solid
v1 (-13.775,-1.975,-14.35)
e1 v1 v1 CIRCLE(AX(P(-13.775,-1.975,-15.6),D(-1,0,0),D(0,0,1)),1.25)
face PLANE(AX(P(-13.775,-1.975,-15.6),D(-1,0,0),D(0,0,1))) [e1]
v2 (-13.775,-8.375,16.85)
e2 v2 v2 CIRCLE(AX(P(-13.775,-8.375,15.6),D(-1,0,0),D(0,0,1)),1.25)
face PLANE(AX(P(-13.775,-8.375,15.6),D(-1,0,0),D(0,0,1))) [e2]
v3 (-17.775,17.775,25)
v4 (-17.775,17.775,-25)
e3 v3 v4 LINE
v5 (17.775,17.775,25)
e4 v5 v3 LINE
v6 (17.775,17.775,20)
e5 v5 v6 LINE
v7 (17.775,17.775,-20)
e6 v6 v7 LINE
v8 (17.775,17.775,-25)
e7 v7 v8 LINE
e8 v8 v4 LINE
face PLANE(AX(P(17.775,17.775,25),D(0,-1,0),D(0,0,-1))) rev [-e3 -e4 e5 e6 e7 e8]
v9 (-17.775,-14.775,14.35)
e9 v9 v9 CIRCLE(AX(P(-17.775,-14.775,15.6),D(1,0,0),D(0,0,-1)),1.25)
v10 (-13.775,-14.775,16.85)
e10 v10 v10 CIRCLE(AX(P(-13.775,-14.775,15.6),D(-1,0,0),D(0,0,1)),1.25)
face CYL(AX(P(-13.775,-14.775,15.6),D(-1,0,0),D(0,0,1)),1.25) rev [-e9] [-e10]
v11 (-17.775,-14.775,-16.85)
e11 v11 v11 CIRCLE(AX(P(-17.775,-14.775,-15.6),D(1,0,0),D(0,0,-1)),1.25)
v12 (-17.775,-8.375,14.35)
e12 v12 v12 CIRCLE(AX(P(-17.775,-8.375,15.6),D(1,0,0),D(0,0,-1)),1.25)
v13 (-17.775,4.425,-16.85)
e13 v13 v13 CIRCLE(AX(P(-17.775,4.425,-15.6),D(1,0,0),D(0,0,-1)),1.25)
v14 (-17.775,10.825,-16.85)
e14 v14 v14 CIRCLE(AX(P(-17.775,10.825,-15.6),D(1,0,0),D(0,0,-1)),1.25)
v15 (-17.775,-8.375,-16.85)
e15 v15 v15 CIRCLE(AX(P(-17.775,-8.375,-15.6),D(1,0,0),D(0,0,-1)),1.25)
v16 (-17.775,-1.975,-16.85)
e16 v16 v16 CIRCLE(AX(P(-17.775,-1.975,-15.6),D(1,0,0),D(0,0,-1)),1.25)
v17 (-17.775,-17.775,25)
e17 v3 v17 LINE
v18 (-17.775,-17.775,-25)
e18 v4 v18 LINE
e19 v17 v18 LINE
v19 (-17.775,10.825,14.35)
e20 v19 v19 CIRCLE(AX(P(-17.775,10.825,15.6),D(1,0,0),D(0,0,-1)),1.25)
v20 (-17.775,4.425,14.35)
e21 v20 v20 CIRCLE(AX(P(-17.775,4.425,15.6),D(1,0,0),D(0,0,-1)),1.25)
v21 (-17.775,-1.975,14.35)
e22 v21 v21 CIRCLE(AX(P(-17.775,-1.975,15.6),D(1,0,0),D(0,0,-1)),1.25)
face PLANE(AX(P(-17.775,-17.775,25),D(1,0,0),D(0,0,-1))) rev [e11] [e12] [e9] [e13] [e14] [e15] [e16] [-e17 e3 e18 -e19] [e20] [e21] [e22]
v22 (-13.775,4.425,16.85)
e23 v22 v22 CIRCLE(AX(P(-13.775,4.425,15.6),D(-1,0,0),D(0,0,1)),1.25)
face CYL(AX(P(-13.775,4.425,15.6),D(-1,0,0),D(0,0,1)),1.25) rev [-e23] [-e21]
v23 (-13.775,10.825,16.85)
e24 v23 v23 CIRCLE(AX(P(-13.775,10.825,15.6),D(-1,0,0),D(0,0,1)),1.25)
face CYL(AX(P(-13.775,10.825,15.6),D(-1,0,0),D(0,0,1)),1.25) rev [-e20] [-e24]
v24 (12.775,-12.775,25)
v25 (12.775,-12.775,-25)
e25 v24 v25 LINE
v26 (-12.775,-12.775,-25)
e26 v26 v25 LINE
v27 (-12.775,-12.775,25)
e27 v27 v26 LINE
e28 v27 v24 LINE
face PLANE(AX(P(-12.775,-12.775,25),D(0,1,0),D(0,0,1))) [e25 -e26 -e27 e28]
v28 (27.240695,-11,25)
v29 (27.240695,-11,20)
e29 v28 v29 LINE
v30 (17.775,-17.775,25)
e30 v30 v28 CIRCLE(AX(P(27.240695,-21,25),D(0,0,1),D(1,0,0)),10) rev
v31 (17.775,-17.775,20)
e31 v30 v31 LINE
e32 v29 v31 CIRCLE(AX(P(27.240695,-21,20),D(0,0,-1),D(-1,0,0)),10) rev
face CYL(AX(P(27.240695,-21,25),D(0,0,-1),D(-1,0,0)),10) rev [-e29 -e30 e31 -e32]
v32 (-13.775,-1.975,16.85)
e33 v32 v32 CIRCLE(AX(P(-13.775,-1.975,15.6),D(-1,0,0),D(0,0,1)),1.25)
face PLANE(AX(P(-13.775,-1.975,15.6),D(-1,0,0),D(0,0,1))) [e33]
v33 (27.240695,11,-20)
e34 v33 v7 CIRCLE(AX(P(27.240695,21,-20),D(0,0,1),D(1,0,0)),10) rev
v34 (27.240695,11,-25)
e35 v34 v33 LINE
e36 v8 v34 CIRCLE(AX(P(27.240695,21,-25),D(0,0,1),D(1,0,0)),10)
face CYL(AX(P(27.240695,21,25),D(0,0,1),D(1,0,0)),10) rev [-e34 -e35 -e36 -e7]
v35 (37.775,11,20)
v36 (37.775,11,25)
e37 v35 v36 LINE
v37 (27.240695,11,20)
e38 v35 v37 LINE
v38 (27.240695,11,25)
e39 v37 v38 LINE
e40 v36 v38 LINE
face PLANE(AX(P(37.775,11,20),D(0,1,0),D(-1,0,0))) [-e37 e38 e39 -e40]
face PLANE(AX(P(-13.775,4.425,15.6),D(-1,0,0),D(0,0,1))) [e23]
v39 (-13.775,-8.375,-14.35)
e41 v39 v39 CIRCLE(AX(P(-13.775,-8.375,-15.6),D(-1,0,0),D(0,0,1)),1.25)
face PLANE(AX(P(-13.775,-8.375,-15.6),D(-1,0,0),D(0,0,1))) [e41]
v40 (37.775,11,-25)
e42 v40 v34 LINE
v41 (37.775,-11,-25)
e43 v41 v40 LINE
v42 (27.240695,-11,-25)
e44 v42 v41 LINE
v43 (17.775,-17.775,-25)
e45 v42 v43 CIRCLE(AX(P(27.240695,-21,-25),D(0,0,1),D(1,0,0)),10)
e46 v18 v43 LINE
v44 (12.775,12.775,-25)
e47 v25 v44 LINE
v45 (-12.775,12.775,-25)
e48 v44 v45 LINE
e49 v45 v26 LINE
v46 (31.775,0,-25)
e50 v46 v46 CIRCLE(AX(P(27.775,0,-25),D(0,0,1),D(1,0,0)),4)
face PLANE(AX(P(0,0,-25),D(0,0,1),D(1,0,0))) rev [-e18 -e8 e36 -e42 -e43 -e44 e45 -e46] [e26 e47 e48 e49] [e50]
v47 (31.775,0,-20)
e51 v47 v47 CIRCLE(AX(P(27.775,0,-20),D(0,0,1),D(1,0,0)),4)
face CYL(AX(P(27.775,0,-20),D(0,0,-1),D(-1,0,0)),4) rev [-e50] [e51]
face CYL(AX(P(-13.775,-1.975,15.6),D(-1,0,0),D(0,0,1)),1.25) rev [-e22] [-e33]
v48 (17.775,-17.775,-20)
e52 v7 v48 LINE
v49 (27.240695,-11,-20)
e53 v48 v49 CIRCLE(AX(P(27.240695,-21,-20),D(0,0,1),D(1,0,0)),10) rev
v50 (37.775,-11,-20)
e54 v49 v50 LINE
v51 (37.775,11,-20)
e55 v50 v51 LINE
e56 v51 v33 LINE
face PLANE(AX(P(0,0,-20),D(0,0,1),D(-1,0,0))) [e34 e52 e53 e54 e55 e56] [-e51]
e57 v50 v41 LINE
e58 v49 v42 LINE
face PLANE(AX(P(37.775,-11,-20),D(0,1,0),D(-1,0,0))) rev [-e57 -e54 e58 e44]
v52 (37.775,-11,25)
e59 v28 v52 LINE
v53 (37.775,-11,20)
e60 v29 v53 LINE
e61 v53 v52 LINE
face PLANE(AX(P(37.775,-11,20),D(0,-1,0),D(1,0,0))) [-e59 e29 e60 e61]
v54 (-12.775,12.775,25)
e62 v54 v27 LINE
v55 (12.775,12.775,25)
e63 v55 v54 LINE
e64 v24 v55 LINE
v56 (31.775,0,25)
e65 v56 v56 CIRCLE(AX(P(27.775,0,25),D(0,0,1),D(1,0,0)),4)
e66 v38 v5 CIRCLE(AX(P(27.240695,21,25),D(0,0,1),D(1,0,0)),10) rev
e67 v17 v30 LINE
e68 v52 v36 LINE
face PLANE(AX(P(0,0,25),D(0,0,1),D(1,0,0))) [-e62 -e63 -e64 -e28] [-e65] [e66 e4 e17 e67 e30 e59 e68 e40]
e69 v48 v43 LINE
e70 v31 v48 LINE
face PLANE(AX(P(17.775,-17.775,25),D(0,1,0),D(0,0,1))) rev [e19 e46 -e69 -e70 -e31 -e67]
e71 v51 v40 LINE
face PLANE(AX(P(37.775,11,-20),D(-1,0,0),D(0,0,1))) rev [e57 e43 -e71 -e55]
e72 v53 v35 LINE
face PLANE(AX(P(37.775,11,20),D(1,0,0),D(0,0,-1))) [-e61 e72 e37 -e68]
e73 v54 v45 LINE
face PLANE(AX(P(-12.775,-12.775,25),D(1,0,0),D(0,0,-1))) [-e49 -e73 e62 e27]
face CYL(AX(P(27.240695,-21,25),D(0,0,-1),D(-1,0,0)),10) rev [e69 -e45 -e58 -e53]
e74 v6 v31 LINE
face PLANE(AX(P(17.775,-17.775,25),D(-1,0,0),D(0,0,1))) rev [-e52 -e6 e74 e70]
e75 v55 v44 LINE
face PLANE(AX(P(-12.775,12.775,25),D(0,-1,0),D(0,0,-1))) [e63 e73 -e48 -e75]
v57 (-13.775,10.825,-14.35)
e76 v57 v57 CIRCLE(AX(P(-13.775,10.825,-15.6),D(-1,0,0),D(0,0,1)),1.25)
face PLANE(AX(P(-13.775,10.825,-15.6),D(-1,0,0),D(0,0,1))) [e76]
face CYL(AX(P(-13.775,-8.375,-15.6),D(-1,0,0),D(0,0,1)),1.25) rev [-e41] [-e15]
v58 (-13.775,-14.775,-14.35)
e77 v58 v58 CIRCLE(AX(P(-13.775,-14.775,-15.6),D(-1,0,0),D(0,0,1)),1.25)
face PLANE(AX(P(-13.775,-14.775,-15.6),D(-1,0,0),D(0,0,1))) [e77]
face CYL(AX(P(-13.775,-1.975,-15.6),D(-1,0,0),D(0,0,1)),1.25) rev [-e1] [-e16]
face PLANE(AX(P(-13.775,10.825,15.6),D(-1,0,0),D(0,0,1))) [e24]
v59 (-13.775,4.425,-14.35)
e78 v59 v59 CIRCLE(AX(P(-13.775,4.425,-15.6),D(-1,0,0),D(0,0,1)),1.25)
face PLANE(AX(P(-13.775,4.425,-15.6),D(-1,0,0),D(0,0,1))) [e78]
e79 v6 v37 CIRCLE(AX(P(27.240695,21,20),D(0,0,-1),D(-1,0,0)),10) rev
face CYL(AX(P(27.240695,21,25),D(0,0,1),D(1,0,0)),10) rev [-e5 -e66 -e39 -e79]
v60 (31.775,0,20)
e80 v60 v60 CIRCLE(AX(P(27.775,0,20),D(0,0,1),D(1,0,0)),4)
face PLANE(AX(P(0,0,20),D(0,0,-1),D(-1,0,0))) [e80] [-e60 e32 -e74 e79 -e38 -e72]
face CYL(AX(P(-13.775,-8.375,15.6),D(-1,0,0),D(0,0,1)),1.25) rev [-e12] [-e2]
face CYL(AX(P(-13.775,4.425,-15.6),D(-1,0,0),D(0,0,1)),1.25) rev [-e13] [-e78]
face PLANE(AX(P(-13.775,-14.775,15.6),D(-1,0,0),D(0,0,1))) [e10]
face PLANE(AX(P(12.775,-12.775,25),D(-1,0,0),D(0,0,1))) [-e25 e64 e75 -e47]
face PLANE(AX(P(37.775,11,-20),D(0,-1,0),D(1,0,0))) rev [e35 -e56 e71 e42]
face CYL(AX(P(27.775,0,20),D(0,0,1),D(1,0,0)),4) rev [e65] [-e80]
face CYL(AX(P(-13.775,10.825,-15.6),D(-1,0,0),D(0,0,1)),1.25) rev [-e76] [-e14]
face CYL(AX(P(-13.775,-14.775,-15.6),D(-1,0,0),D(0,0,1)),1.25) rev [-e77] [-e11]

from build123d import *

# Parameters (mm, degrees)
SKETCH1_W            = 35.55
SKETCH1_H            = 35.55
SKETCH1_W_2          = 25.55
SKETCH1_H_2          = 25.55
BOSS_EXTRUDE1_DEPTH  = 25
SKETCH2_R            = 1.25
CUT_EXTRUDE1_DEPTH   = 4
SKETCH3_W            = 20
SKETCH3_H            = 22
SKETCH3_R            = 4
BOSS_EXTRUDE2_DEPTH  = 5
FILLET1_R            = 10
FILLET1_OF_MIRROR2_R = 10


with BuildPart() as part:
    # Sketch1 → Boss-Extrude1 (new, symmetric)
    with BuildSketch(Plane.XY):
        Rectangle(SKETCH1_W, SKETCH1_H)
        Rectangle(SKETCH1_W_2, SKETCH1_H_2, mode=Mode.SUBTRACT)
    extrude(amount=BOSS_EXTRUDE1_DEPTH, both=True)

    # Sketch2 → Cut-Extrude1 (cut, symmetric)
    with BuildSketch(Plane.ZY.offset(17.775)):
        with Locations((-15.6, -14.775)):
            Circle(SKETCH2_R)
        with Locations((15.6, -14.775)):
            Circle(SKETCH2_R)
        with Locations((-15.6, -8.375)):
            Circle(SKETCH2_R)
        with Locations((15.6, -8.375)):
            Circle(SKETCH2_R)
        with Locations((-15.6, -1.975)):
            Circle(SKETCH2_R)
        with Locations((15.6, -1.975)):
            Circle(SKETCH2_R)
        with Locations((-15.6, 4.425)):
            Circle(SKETCH2_R)
        with Locations((15.6, 4.425)):
            Circle(SKETCH2_R)
        with Locations((-15.6, 10.825)):
            Circle(SKETCH2_R)
        with Locations((15.6, 10.825)):
            Circle(SKETCH2_R)
    extrude(amount=CUT_EXTRUDE1_DEPTH, both=True, mode=Mode.SUBTRACT)

    # Sketch3 → Boss-Extrude2 (add)
    with BuildSketch(Plane.XY.offset(25)):
        with Locations((27.775, 0)):
            Rectangle(SKETCH3_W, SKETCH3_H)
        with Locations((27.775, 0)):
            Circle(SKETCH3_R, mode=Mode.SUBTRACT)
    boss_extrude2 = extrude(amount=-BOSS_EXTRUDE2_DEPTH)

    # Fillet1
    # the kernel refuses this fillet: 10 mm, written as the material it adds along each edge
    with BuildSketch(Plane(origin=(17.775, -11, 25), x_dir=(0, -1, 0), z_dir=(0, 0, -1))) as fillet1_piece_1:
        with BuildLine():
            CenterArc((10, -9.465694639), FILLET1_R, 108.814181852, 71.185818148)
            Line((0, -9.465694639), (-0.2, -9.465694639))
            Line((-0.2, -9.465694639), (-0.2, 0))
            Line((-0.2, 0), (0, 0.2))
            ThreePointArc((0, 0.2), (3.3875, 0.2), (6.7105, 0.189313893))
            Line((6.7105, 0.189313893), (6.775, 0))
        make_face()
    extrude(amount=5)
    with BuildSketch(Plane(origin=(17.775, 11, 25), x_dir=(0, 1, 0), z_dir=(0, 0, -1))) as fillet1_piece_2:
        with BuildLine():
            CenterArc((10, 9.465694639), FILLET1_R, 180, 71.185818148)
            Line((0, 9.465694639), (-0.2, 9.465694639))
            Line((-0.2, 9.465694639), (-0.2, 0))
            Line((-0.2, 0), (0, -0.2))
            ThreePointArc((0, -0.2), (3.3875, -0.2), (6.7105, -0.189313893))
            Line((6.7105, -0.189313893), (6.775, 0))
        make_face()
    extrude(amount=5)

    # Mirror2: Boss-Extrude2 across plane
    add(boss_extrude2.mirror(Plane.XY))

    # Fillet1 of Mirror2
    # the kernel refuses this fillet: 10 mm, written as the material it adds along each edge
    with BuildSketch(Plane(origin=(17.775, -11, -25), x_dir=(0, -1, 0), z_dir=(0, 0, 1))) as fillet1_of_mirror2_piece_1:
        with BuildLine():
            CenterArc((10, 9.465694639), FILLET1_OF_MIRROR2_R, 180, 71.185818148)
            Line((0, 9.465694639), (-0.2, 9.465694639))
            Line((-0.2, 9.465694639), (-0.2, 0))
            Line((-0.2, 0), (0, -0.2))
            ThreePointArc((0, -0.2), (3.3875, -0.2), (6.7105, -0.189313893))
            Line((6.7105, -0.189313893), (6.775, 0))
        make_face()
    extrude(amount=5)
    with BuildSketch(Plane(origin=(17.775, 11, -25), x_dir=(0, 1, 0), z_dir=(0, 0, 1))) as fillet1_of_mirror2_piece_2:
        with BuildLine():
            CenterArc((10, -9.465694639), FILLET1_OF_MIRROR2_R, 108.814181852, 71.185818148)
            Line((0, -9.465694639), (-0.2, -9.465694639))
            Line((-0.2, -9.465694639), (-0.2, 0))
            Line((-0.2, 0), (0, 0.2))
            ThreePointArc((0, 0.2), (3.3875, 0.2), (6.7105, 0.189313893))
            Line((6.7105, 0.189313893), (6.775, 0))
        make_face()
    extrude(amount=5)


solid = part.part
